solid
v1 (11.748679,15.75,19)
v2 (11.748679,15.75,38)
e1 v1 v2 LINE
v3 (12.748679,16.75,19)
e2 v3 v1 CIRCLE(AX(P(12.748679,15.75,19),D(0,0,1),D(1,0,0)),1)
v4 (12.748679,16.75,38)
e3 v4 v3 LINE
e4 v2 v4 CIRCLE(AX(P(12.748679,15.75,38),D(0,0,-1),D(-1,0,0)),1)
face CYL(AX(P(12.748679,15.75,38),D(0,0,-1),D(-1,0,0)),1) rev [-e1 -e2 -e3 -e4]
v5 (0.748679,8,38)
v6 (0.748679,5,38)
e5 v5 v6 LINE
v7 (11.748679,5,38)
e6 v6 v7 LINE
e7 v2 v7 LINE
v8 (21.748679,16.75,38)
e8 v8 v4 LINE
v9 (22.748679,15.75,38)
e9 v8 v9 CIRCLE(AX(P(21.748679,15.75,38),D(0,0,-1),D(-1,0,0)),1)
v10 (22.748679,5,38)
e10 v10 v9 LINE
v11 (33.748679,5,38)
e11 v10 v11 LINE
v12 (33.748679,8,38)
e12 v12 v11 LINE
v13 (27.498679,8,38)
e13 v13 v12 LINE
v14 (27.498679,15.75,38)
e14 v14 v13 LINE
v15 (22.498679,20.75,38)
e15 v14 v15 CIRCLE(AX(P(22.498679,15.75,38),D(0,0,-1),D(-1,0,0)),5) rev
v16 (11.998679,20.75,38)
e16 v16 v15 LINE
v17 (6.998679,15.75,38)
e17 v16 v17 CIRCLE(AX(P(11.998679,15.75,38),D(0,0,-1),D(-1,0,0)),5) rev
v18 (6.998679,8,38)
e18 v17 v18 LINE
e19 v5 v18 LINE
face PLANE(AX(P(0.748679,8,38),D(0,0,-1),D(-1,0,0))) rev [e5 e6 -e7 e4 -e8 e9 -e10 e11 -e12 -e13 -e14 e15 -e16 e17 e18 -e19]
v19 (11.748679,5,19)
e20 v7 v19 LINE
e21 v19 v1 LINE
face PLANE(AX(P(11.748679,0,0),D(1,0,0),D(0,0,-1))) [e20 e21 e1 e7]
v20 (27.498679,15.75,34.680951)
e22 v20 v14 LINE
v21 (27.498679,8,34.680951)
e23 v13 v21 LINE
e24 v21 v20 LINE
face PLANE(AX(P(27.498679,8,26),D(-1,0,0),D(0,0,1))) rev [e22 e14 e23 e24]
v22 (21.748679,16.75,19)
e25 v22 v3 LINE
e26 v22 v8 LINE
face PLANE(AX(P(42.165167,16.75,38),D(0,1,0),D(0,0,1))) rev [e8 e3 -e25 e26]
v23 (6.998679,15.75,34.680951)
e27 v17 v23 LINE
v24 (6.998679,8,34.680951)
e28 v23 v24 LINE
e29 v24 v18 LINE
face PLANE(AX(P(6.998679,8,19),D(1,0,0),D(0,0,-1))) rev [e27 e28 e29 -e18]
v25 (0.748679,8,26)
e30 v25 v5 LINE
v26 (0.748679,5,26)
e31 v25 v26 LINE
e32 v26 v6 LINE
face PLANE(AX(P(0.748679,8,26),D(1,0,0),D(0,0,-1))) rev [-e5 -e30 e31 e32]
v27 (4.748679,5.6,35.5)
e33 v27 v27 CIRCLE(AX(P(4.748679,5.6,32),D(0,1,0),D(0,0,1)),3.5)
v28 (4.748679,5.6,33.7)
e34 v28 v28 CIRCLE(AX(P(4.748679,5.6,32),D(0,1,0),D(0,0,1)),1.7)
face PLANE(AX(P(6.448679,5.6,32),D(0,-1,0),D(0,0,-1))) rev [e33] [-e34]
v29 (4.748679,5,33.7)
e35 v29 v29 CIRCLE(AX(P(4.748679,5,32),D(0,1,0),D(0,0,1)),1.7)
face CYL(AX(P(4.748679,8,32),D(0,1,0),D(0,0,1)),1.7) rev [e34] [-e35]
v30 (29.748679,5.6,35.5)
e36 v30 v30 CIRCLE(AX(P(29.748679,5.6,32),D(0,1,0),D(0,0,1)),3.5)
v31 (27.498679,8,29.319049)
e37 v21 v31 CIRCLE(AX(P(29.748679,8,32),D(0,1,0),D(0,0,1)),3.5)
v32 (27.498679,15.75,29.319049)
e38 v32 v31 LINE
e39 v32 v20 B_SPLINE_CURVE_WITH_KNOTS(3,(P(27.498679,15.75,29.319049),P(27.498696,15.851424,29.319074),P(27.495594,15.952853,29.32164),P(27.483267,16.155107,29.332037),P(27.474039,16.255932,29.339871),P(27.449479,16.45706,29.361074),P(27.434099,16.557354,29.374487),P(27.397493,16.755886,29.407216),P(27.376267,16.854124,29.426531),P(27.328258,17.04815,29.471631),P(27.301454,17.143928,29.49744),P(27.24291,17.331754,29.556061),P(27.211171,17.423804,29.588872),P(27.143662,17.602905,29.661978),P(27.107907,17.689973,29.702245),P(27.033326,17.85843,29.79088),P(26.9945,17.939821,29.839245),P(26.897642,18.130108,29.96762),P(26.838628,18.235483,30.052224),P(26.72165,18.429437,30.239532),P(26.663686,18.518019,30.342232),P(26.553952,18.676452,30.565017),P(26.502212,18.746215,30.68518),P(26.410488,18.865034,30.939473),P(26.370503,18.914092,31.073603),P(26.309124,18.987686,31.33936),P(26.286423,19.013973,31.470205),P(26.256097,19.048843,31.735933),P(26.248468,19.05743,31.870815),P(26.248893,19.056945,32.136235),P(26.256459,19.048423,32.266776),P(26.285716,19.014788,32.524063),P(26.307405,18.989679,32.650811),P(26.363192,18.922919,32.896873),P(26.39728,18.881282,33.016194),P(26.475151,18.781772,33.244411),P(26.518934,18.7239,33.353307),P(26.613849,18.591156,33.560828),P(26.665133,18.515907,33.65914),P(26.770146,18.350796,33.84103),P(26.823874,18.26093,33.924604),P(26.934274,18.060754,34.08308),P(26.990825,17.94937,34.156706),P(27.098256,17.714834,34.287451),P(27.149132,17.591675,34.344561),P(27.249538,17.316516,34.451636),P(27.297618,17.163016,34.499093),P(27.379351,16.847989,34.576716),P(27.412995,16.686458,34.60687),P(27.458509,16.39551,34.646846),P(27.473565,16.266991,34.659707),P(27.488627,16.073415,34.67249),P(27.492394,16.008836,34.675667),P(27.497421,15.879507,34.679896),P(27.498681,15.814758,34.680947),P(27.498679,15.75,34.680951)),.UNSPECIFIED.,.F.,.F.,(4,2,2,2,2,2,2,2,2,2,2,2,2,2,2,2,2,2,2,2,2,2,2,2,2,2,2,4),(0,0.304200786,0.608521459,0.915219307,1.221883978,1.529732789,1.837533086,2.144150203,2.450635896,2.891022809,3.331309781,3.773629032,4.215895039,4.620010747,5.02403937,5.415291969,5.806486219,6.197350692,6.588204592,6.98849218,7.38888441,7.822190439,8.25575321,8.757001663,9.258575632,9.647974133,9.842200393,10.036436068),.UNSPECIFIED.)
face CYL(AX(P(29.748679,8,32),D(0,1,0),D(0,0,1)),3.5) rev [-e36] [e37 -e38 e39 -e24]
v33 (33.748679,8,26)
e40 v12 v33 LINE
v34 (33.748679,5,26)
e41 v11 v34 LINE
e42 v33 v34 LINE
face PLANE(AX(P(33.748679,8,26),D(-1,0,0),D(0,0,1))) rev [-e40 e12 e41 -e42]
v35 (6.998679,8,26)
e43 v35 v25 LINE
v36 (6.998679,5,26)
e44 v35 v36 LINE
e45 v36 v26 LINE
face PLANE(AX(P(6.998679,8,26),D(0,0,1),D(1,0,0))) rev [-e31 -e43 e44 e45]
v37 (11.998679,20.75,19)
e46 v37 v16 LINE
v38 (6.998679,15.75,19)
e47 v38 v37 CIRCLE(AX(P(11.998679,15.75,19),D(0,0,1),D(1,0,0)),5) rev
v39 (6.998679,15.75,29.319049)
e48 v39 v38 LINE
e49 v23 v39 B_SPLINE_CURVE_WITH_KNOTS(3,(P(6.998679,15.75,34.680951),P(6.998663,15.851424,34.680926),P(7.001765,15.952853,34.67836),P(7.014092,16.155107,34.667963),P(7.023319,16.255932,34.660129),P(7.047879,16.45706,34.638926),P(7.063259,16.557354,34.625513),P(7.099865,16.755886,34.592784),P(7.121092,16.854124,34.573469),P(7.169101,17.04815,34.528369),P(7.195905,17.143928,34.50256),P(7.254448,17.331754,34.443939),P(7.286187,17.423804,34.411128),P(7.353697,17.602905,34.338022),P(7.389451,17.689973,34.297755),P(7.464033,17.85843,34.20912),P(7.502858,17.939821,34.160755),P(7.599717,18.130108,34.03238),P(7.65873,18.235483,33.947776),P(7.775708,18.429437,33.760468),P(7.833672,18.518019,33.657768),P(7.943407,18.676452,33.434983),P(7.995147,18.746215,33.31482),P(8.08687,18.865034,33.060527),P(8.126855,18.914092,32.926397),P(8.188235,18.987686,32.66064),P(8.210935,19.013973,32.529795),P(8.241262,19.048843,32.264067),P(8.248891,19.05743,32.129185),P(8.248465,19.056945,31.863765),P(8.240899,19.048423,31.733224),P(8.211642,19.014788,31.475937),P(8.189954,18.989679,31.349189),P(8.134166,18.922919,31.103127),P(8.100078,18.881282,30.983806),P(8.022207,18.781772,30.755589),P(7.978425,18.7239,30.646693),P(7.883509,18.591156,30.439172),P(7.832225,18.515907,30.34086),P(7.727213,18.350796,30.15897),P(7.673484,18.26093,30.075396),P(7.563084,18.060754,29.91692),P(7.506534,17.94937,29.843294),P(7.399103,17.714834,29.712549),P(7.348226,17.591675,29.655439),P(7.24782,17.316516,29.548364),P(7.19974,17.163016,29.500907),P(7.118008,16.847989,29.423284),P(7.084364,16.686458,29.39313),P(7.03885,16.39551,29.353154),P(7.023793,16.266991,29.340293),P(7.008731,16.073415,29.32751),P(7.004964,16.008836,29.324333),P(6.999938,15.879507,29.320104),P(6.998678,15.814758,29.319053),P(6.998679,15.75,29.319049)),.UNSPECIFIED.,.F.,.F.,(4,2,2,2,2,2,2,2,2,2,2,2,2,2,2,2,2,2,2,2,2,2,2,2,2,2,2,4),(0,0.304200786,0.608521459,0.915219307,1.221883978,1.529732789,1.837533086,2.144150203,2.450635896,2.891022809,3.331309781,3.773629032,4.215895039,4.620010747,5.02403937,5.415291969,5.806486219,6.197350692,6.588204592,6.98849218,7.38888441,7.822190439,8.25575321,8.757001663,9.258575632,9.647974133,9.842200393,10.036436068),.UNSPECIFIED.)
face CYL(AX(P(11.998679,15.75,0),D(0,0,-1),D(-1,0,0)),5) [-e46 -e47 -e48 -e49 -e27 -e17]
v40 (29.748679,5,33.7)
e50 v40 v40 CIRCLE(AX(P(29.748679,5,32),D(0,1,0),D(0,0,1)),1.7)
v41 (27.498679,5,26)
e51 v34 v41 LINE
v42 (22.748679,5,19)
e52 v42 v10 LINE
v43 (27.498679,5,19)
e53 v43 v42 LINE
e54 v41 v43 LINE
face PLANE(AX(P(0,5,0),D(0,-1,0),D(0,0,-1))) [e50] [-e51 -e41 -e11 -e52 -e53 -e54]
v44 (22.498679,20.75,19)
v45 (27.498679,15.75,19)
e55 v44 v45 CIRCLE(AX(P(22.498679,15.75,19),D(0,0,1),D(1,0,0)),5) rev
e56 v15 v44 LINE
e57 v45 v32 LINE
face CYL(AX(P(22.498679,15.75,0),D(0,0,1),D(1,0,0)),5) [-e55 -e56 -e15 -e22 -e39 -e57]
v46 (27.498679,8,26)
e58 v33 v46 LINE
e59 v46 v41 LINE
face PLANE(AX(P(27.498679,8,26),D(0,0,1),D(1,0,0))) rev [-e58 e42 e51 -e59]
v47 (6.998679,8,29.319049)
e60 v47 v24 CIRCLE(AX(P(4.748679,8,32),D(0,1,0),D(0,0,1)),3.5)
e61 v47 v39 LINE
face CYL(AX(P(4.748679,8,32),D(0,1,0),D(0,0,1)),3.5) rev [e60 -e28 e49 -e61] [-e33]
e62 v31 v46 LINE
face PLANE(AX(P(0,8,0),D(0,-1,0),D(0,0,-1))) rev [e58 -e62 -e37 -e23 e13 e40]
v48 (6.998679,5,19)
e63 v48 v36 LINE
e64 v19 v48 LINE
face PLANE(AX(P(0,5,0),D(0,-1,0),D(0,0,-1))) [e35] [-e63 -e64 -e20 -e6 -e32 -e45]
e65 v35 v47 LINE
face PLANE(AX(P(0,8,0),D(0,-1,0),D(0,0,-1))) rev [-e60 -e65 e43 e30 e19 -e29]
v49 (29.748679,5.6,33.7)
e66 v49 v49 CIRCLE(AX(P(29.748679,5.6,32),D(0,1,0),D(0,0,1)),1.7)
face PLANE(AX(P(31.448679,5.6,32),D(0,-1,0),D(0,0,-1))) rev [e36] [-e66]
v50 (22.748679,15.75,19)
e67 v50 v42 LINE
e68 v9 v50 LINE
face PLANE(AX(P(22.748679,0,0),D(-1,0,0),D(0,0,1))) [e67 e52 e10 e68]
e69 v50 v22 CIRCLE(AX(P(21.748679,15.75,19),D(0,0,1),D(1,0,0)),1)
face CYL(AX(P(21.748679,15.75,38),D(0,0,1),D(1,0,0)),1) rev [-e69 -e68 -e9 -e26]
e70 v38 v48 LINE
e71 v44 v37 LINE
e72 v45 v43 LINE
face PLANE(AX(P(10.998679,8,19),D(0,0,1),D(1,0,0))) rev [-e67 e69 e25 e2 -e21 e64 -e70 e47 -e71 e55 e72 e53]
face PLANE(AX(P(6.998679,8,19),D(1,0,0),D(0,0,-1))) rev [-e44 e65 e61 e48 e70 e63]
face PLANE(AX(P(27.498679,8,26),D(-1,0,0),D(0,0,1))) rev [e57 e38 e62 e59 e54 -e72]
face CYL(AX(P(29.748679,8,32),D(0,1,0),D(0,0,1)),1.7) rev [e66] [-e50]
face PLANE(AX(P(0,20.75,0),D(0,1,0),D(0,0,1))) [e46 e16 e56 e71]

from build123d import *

# Parameters (mm, degrees)
BOSS_EXTRUDE2_DEPTH                      = 3
BOSS_EXTRUDE2_2_DEPTH                    = 3
SKETCH2_W                                = 4
SKETCH2_H                                = 19
BOSS_EXTRUDE3_DEPTH                      = 12.75
SKETCH3_W                                = 19
SKETCH3_H                                = 15.75
BOSS_EXTRUDE4_DEPTH                      = 0.75
SKETCH4_W                                = 19
SKETCH4_H                                = 15.75
BOSS_EXTRUDE5_DEPTH                      = 0.75
SKETCH5_W                                = 19
SKETCH5_H                                = 4
BOSS_EXTRUDE6_DEPTH                      = 11
FILLET1_R                                = 5
FILLET2_R                                = 1
CBORE_START                              = 5.6
CBORE_FOR_M3_PAN_HEAD_SCREW1_OUTLINE_R   = 3.5
CBORE_FOR_M3_PAN_HEAD_SCREW1_DEPTH       = 2.4
CBORE_START_2                            = 5
CBORE_FOR_M3_PAN_HEAD_SCREW1_2_OUTLINE_R = 1.7
CBORE_FOR_M3_PAN_HEAD_SCREW1_2_DEPTH     = 0.6
CUT_EXTRUDE1_START                       = -15.15
SKETCH8_R                                = 3.5
CUT_EXTRUDE1_DEPTH                       = 15.15
CUT_EXTRUDE2_START                       = -15.15
SKETCH9_R                                = 3.5
CUT_EXTRUDE2_DEPTH                       = 15.15


# Read off the part's stored shape, not the designer's step: CBORE for M3 Pan Head Screw1
with BuildPart() as part:
    # Sketch1 → Boss-Extrude2 (new body)
    with BuildSketch(Plane(origin=(0, 5, 0), x_dir=(1, 0, 0), z_dir=(0, 1, 0))):
        Polygon((6.998679183, -26), (0.748679183, -26), (0.748679183, -38), (10.998679183, -38), (10.998679183, -19), (6.998679183, -19), align=None)
    extrude(amount=BOSS_EXTRUDE2_DEPTH)



with BuildPart() as body_2:
    # Sketch1 → Boss-Extrude2 2 (new body)
    with BuildSketch(Plane(origin=(0, 5, 0), x_dir=(1, 0, 0), z_dir=(0, 1, 0))):
        Polygon((27.498679183, -26), (33.748679183, -26), (33.748679183, -38), (23.498679183, -38), (23.498679183, -19), (27.498679183, -19), align=None)
    extrude(amount=BOSS_EXTRUDE2_2_DEPTH)


with BuildPart() as part_1:
    add(part.part)

    add(body_2.part)  # Boss-Extrude3 merges body 2
    # Sketch2 → Boss-Extrude3 (add)
    with BuildSketch(Plane(origin=(0, 8, 0), x_dir=(1, 0, 0), z_dir=(0, 1, 0))):
        with Locations((8.998679183, -28.5)):
            Rectangle(SKETCH2_W, SKETCH2_H)
        with Locations((25.498679183, -28.5)):
            Rectangle(SKETCH2_W, SKETCH2_H)
    extrude(amount=BOSS_EXTRUDE3_DEPTH)

    # Sketch3 → Boss-Extrude4 (add)
    with BuildSketch(Plane(origin=(10.998679183, 0, 0), x_dir=(0, 0, -1), z_dir=(1, 0, 0))):
        with Locations((-28.5, 12.875)):
            Rectangle(SKETCH3_W, SKETCH3_H)
    extrude(amount=BOSS_EXTRUDE4_DEPTH)

    # Sketch4 → Boss-Extrude5 (add)
    with BuildSketch(Plane.ZY.offset(-23.498679183)):
        with Locations((28.5, 12.875)):
            Rectangle(SKETCH4_W, SKETCH4_H)
    extrude(amount=BOSS_EXTRUDE5_DEPTH)

    # Sketch5 → Boss-Extrude6 (add)
    with BuildSketch(Plane(origin=(11.748679183, 0, 0), x_dir=(0, 0, -1), z_dir=(1, 0, 0))):
        with Locations((-28.5, 18.75)):
            Rectangle(SKETCH5_W, SKETCH5_H)
    extrude(amount=BOSS_EXTRUDE6_DEPTH)

    # Fillet1
    fillet1_edges = [part_1.edges().sort_by_distance(p)[0] for p in [
        (6.998679183, 20.75, 28.5),
        (27.498679183, 20.75, 28.5),
    ]]
    fillet(fillet1_edges, radius=FILLET1_R)

    # Fillet2
    fillet2_edges = [part_1.edges().sort_by_distance(p)[0] for p in [
        (22.748679183, 16.75, 28.5),
        (11.748679183, 16.75, 28.5),
    ]]
    fillet(fillet2_edges, radius=FILLET2_R)

    # CBORE for M3 Pan Head Screw1 outline → CBORE for M3 Pan Head Screw1 (cut)
    with BuildSketch(Plane(origin=(0, 0, 0), x_dir=(1, 0, 0), z_dir=(0, 1, 0)).offset(CBORE_START)):
        with Locations((29.748679183, -32)):
            Circle(CBORE_FOR_M3_PAN_HEAD_SCREW1_OUTLINE_R)
        with Locations((4.748679183, -32)):
            Circle(CBORE_FOR_M3_PAN_HEAD_SCREW1_OUTLINE_R)
    extrude(amount=CBORE_FOR_M3_PAN_HEAD_SCREW1_DEPTH, mode=Mode.SUBTRACT)

    # CBORE for M3 Pan Head Screw1 2 outline → CBORE for M3 Pan Head Screw1 2 (cut)
    with BuildSketch(Plane(origin=(0, 0, 0), x_dir=(1, 0, 0), z_dir=(0, 1, 0)).offset(CBORE_START_2)):
        with Locations((29.748679183, -32)):
            Circle(CBORE_FOR_M3_PAN_HEAD_SCREW1_2_OUTLINE_R)
        with Locations((4.748679183, -32)):
            Circle(CBORE_FOR_M3_PAN_HEAD_SCREW1_2_OUTLINE_R)
    extrude(amount=CBORE_FOR_M3_PAN_HEAD_SCREW1_2_DEPTH, mode=Mode.SUBTRACT)

    # Sketch8 → Cut-Extrude1 (cut)
    with BuildSketch(Plane(origin=(0, 20.75, 0), x_dir=(1, 0, 0), z_dir=(0, 1, 0)).offset(CUT_EXTRUDE1_START)):
        with Locations(Location((4.748679183, -32, 0), (0, 0, 270))):
            Circle(SKETCH8_R)
    extrude(amount=CUT_EXTRUDE1_DEPTH, mode=Mode.SUBTRACT)

    # Sketch9 → Cut-Extrude2 (cut)
    with BuildSketch(Plane(origin=(0, 20.75, 0), x_dir=(1, 0, 0), z_dir=(0, 1, 0)).offset(CUT_EXTRUDE2_START)):
        with Locations(Location((29.748679183, -32, 0), (0, 0, 270))):
            Circle(SKETCH9_R)
    extrude(amount=CUT_EXTRUDE2_DEPTH, mode=Mode.SUBTRACT)


solid = part_1.part
